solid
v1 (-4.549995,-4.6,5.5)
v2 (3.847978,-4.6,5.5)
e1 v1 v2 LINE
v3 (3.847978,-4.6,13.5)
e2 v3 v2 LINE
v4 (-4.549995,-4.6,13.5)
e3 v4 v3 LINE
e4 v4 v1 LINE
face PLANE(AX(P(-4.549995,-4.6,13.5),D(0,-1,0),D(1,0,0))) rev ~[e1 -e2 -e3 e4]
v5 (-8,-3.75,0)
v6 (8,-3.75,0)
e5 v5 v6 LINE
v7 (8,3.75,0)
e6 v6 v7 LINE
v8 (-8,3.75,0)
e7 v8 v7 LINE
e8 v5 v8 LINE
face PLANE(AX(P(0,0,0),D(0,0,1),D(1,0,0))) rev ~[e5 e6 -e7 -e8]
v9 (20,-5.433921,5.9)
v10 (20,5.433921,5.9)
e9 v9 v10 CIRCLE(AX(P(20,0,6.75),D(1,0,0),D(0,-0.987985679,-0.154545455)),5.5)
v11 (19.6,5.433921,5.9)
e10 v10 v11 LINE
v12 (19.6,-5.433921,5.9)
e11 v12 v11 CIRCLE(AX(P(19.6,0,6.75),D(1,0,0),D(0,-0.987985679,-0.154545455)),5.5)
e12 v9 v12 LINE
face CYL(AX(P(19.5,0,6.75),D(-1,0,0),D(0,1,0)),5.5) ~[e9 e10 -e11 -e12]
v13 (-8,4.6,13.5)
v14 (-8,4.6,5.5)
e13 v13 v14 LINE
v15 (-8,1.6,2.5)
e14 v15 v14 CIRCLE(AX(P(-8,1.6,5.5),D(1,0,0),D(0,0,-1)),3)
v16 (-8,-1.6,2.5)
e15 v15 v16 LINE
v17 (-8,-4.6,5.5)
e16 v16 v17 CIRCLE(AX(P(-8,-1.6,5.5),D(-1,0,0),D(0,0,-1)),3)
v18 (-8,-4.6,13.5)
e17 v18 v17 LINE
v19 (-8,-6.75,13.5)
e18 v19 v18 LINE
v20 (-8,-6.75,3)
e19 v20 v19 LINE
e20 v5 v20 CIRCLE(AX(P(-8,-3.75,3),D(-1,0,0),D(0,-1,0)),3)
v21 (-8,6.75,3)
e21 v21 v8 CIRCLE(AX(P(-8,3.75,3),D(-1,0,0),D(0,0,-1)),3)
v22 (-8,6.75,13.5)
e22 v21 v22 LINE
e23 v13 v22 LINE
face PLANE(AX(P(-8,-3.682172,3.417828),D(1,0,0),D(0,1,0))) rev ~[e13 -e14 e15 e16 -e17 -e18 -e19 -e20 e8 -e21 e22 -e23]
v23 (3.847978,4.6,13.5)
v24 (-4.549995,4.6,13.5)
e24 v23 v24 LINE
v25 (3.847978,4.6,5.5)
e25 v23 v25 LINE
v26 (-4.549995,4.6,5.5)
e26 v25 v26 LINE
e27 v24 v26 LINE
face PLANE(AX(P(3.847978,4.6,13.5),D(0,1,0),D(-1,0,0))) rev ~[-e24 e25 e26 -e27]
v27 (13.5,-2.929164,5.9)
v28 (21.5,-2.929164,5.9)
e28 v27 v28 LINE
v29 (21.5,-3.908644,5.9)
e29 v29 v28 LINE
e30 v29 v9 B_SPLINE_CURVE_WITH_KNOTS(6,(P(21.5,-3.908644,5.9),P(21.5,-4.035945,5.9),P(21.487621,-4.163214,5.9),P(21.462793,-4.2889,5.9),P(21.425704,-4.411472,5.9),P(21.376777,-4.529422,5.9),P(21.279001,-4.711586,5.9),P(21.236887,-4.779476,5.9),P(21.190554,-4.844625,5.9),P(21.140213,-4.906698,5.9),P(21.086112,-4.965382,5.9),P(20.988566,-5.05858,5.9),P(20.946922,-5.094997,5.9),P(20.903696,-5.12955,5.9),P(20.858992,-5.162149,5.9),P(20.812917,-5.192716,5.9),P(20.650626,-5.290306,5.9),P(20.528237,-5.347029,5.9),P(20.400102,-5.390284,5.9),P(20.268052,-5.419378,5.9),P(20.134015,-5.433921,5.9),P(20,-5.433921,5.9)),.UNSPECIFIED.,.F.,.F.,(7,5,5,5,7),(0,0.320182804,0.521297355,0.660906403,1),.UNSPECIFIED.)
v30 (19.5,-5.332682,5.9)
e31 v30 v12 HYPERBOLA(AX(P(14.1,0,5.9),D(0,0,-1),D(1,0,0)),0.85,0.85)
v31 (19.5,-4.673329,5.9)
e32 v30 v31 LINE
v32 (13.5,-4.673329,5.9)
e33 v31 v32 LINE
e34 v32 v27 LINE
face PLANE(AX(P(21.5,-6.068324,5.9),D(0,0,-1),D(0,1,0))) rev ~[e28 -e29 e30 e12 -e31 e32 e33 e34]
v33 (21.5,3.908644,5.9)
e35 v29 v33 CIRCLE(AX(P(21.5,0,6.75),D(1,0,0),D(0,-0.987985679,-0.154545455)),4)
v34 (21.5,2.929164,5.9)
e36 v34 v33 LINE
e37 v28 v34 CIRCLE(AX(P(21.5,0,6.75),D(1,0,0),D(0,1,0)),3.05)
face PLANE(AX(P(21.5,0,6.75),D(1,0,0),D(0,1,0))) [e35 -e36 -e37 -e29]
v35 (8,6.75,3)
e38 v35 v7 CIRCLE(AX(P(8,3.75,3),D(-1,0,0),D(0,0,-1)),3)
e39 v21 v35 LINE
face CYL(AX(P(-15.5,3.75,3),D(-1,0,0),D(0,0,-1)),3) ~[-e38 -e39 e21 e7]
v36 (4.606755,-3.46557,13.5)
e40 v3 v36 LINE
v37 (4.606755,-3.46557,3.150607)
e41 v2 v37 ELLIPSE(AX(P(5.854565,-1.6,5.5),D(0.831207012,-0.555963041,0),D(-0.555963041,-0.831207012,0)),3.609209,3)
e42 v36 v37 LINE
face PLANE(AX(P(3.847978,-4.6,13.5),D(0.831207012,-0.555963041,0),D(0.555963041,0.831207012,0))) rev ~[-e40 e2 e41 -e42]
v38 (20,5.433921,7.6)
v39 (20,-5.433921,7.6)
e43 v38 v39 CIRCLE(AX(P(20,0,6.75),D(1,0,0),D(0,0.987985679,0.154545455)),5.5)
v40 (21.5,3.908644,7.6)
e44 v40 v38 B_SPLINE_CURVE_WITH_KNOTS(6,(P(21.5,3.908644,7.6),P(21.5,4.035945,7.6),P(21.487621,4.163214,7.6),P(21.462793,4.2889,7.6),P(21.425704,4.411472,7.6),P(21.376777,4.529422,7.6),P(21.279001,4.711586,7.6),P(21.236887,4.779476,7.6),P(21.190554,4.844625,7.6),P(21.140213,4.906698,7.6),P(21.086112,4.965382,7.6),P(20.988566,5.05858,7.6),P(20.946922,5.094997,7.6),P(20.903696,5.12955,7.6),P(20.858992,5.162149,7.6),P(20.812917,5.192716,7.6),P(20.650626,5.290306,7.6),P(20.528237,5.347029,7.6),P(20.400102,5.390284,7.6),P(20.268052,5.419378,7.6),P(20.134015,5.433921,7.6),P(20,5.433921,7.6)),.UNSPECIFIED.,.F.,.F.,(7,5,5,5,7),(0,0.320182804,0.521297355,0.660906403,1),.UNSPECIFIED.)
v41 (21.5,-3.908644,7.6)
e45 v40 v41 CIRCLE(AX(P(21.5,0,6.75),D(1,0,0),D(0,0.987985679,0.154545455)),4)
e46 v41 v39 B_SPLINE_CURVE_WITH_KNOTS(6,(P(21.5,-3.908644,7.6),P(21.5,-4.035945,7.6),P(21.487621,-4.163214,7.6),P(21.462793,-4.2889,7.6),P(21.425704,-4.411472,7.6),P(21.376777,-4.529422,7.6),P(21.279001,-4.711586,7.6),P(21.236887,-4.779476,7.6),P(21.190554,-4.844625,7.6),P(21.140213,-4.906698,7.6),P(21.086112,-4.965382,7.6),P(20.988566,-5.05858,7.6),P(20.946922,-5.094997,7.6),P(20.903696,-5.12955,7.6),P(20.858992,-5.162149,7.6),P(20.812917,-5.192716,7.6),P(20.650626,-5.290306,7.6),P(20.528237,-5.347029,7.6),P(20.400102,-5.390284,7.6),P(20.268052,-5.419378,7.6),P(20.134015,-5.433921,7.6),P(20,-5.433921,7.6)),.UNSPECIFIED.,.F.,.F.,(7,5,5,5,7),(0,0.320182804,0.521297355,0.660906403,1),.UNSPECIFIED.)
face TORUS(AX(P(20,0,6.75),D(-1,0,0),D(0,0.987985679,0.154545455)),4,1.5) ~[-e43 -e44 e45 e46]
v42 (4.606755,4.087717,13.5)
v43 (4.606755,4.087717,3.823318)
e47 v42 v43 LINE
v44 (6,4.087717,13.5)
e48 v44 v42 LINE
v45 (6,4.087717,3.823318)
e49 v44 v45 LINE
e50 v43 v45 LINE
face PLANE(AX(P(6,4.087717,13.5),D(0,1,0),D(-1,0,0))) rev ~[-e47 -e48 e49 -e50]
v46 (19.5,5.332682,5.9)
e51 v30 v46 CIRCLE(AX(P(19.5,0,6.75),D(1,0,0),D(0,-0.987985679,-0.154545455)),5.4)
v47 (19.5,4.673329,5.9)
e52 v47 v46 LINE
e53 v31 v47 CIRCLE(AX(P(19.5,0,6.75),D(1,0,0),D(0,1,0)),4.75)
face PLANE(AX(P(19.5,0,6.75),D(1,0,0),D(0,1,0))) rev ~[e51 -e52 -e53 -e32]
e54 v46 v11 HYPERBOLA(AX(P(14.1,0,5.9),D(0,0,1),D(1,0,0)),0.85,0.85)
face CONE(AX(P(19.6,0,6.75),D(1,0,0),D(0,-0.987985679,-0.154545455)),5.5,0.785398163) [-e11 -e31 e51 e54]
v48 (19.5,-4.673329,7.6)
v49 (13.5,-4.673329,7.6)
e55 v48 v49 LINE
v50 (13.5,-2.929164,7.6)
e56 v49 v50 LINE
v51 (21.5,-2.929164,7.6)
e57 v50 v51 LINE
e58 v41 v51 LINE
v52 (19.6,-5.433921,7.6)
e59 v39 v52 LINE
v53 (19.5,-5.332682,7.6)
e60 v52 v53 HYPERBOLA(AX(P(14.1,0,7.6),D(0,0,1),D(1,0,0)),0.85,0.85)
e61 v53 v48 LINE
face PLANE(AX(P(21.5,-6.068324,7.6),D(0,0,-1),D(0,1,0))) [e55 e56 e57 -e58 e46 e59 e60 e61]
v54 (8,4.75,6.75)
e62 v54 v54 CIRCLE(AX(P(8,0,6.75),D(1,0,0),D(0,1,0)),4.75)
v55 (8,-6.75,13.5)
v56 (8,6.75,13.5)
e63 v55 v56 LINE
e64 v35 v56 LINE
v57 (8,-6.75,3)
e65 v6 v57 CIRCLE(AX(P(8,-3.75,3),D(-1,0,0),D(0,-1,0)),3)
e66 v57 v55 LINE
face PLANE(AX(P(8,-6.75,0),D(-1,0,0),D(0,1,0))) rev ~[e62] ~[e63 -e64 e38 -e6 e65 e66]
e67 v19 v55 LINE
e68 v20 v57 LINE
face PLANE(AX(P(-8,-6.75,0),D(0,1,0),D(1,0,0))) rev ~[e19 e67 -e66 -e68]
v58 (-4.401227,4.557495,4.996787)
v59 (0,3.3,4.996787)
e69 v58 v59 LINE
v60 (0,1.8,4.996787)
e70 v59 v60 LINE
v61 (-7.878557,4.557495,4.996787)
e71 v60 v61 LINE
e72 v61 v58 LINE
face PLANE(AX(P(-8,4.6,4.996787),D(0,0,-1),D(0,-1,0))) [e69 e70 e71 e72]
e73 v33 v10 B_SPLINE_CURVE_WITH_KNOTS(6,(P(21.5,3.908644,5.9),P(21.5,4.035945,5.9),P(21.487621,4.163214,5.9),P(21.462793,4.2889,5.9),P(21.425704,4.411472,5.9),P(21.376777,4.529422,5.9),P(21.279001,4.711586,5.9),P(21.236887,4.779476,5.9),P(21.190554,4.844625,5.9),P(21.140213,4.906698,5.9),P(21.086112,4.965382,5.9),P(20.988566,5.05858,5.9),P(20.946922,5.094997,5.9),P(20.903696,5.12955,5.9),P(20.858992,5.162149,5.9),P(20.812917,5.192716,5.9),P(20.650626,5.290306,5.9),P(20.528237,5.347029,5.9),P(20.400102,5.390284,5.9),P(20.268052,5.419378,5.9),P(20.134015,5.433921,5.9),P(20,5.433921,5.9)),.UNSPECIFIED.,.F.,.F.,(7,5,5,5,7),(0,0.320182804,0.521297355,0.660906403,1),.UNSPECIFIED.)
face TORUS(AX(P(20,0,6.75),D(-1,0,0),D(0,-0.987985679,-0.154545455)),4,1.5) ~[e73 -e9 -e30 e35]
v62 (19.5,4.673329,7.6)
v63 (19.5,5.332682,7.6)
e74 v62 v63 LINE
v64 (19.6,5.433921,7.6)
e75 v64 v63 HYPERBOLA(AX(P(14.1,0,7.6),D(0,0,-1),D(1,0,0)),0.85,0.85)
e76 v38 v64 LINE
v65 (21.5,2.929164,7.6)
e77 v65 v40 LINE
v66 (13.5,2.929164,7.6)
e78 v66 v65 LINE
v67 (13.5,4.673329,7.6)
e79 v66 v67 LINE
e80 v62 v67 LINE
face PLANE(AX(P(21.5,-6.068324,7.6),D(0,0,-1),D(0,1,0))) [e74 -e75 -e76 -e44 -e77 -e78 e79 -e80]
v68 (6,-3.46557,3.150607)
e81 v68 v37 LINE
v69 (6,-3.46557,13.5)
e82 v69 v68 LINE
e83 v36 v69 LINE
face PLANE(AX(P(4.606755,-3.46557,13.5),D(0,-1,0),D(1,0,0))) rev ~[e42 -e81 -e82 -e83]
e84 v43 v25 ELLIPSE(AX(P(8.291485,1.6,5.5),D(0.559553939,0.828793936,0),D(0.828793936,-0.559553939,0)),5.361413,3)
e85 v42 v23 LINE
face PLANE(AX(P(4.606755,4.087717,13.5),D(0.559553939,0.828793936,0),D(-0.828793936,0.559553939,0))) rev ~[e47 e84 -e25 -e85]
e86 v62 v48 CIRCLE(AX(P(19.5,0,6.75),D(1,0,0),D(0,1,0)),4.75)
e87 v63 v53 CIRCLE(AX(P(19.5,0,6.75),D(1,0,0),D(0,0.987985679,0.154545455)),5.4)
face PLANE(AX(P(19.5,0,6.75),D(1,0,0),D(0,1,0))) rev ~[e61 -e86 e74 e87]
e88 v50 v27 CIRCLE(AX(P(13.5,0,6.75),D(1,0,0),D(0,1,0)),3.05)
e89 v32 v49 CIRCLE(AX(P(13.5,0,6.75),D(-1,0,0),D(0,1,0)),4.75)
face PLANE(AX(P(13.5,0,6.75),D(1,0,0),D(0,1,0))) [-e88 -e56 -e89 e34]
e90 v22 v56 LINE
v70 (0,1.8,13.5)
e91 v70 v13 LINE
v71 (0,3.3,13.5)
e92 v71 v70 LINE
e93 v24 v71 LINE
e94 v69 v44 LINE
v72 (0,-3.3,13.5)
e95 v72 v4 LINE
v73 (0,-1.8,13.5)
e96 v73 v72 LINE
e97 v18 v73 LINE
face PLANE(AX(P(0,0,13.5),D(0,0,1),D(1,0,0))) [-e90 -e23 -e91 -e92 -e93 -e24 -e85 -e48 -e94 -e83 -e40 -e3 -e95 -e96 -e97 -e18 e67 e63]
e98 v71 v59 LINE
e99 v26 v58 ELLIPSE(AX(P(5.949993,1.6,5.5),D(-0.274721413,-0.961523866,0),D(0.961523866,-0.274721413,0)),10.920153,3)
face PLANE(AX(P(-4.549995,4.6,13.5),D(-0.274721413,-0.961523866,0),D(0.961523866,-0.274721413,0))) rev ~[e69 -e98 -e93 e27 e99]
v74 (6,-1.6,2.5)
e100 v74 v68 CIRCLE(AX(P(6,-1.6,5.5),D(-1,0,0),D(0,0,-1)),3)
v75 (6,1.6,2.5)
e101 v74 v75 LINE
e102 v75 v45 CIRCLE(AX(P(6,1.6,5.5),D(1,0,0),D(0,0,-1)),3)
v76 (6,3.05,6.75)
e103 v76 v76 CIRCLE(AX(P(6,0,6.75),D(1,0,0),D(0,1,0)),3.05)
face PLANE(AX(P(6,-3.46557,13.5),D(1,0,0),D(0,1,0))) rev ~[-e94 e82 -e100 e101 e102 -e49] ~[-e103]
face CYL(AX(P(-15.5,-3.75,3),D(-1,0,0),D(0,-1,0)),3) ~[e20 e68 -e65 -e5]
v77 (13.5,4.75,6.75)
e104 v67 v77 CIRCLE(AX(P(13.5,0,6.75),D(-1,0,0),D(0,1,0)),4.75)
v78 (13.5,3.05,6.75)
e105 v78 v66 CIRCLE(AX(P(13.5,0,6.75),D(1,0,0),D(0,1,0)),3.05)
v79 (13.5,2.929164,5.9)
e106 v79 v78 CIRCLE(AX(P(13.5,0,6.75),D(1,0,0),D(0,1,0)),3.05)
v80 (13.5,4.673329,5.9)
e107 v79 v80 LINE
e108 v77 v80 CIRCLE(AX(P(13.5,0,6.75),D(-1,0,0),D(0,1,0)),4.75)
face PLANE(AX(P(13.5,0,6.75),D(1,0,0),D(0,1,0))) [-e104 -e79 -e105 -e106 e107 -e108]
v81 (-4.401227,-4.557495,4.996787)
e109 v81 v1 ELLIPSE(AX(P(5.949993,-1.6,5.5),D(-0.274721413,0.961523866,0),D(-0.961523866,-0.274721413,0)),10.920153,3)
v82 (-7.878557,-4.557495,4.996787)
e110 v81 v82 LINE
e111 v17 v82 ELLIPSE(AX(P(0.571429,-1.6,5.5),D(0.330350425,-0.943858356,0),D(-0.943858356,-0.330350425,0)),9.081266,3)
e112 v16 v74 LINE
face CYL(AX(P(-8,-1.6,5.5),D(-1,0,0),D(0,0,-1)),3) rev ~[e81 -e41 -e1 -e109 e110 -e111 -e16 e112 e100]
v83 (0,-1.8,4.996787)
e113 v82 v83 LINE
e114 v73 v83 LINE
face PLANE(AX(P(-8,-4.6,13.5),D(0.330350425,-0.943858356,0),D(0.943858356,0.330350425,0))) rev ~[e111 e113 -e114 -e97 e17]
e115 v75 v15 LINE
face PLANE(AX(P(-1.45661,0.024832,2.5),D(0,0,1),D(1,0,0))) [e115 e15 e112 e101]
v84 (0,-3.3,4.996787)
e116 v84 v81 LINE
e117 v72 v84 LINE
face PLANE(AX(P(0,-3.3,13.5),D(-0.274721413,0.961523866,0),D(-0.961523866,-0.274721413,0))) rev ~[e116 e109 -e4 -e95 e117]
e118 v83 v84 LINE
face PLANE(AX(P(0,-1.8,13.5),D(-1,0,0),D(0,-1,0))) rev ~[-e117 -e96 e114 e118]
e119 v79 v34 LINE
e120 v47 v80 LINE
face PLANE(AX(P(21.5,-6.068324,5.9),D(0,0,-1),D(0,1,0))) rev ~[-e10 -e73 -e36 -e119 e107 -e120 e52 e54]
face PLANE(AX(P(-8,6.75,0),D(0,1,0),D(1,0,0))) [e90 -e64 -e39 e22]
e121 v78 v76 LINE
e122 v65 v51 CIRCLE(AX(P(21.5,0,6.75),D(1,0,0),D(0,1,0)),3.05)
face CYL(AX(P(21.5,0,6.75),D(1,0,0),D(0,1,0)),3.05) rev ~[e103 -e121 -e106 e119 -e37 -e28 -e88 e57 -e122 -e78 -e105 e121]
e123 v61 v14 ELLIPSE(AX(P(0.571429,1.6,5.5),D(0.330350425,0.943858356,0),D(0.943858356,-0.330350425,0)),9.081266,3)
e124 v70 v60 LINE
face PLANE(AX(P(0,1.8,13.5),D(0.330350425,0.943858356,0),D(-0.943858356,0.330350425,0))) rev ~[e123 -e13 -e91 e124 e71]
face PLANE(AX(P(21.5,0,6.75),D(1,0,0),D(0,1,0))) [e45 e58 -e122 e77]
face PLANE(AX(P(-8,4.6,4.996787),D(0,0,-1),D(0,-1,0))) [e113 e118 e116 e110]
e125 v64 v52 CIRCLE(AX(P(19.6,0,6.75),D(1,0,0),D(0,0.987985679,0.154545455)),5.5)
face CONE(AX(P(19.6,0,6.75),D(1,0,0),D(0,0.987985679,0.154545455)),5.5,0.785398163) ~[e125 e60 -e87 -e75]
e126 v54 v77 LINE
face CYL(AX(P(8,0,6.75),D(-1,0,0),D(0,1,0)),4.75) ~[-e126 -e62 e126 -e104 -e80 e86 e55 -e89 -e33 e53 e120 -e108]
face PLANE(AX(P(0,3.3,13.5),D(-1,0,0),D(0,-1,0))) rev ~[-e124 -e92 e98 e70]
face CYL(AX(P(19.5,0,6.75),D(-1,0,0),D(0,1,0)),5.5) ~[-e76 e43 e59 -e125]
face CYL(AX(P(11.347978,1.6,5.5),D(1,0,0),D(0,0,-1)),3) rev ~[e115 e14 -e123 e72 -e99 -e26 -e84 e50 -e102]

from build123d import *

# Parameters (mm, degrees)
F0_W          = 16
F0_H          = 13.5
F1_DEPTH      = 13.5
F2_R          = 4.75
F3_DEPTH      = 11.5
F4_R          = 5.5
F5_DEPTH      = 2
F7_DEPTH      = 11
F8_R          = 3.05
F9_DEPTH      = 17
F10_W         = 9.2
F10_H         = 2.4967868254
F11_DEPTH     = 10
F12_W         = 12.1366479748
F12_H         = 1.7
F13_DEPTH     = 8
F14_T4_DEPTH  = 19.347977845
F14_T9_DEPTH  = 19.347977845
F14_T11_DEPTH = 31
F15_R         = 1.5
F16_SIZE      = 0.1


# Not quite as in the source:
# - a fillet or chamfer that OpenCascade refuses, or shapes differently, is made with other operations: its cross-section is extruded or revolved along the edge and cut away or added


with BuildPart() as f1:
    # F0 (on Top) → F1 (new body)
    with BuildSketch(Plane.XY):
        Rectangle(F0_W, F0_H)
    extrude(amount=F1_DEPTH)

    # F2 (on face) → F3 (join)
    with BuildSketch(Plane.YZ.offset(8)):
        with Locations((0, 6.75)):
            Circle(F2_R)
    extrude(amount=F3_DEPTH)

    # F4 (on face) → F5 (join)
    with BuildSketch(Plane.YZ.offset(19.5)):
        with Locations((0, 6.75)):
            Circle(F4_R)
    extrude(amount=F5_DEPTH)

    # F6 (on face) → F7 (cut)
    with BuildSketch(Plane.XY.offset(13.5)):
        Polygon((0, 3.3), (0, 1.8), (-8, 4.6), (-8, -4.6), (0, -1.8), (0, -3.3), (-4.5499948867, -4.6), (3.847977845, -4.6), (4.6067554504, -3.4655697951), (6, -3.4655697951), (6, 4.0877170554), (4.6067554504, 4.0877170554), (3.847977845, 4.6), (-4.5499948867, 4.6), align=None)
    extrude(amount=-F7_DEPTH, mode=Mode.SUBTRACT)

    # F8 (on face) → F9 (cut)
    with BuildSketch(Plane.YZ.offset(21.5)):
        with Locations((0, 6.75)):
            Circle(F8_R)
    extrude(amount=-F9_DEPTH, mode=Mode.SUBTRACT)

    # F10 (on face) → F11 (cut)
    with BuildSketch(Plane(origin=(-8, 0, 0), x_dir=(0, -1, 0), z_dir=(-1, 0, 0))):
        with Locations((0, 3.7483934127)):
            Rectangle(F10_W, F10_H)
    extrude(amount=-F11_DEPTH, mode=Mode.SUBTRACT)

    # F12 (on face) → F13 (cut)
    with BuildSketch(Plane.YZ.offset(21.5)):
        with Locations((0, 6.75)):
            Rectangle(F12_W, F12_H)
    extrude(amount=-F13_DEPTH, mode=Mode.SUBTRACT)

    # F14: fillet of radius 3 on 4 edges, made by hand


with BuildPart() as f14_tool2:
    # F14_s3 → F14_t4 (new body)
    with BuildSketch(Plane.YZ.offset(11.347977845)):
        with BuildLine():
            ThreePointArc((1.6, 2.5), (3.7213203436, 3.3786796564), (4.6, 5.5))
            Line((4.6, 5.5), (4.6, 2.5))
            Line((4.6, 2.5), (1.6, 2.5))
        make_face()
    extrude(amount=-F14_T4_DEPTH)

    split(bisect_by=Plane.YZ.offset(6), keep=Keep.BOTTOM)


with BuildPart() as f1_1:
    add(f1.part)

    # F14_t1: union F14_tool2
    add(f14_tool2.part)


with BuildPart() as f14_tool7:
    # F14_s8 → F14_t9 (new body)
    with BuildSketch(Plane.YZ.offset(-8)):
        with BuildLine():
            ThreePointArc((-1.6, 2.5), (-3.7213203436, 3.3786796564), (-4.6, 5.5))
            Line((-4.6, 5.5), (-4.6, 2.5))
            Line((-4.6, 2.5), (-1.6, 2.5))
        make_face()
    extrude(amount=F14_T9_DEPTH)

    split(bisect_by=Plane.YZ.offset(6), keep=Keep.BOTTOM)


with BuildPart() as f1_2:
    add(f1_1.part)

    # F14_t6: union F14_tool7
    add(f14_tool7.part)

    # F14_s12 → F14_t11 (cut)
    with BuildSketch(Plane.YZ.offset(-15.5)):
        with BuildLine():
            ThreePointArc((3.75, 0), (5.8713203436, 0.8786796564), (6.75, 3))
            Line((6.75, 3), (6.75, 0))
            Line((6.75, 0), (3.75, 0))
        make_face()
        with BuildLine():
            ThreePointArc((-6.75, 3), (-5.8713203436, 0.8786796564), (-3.75, 0))
            Line((-3.75, 0), (-6.75, 0))
            Line((-6.75, 0), (-6.75, 3))
        make_face()
    extrude(amount=F14_T11_DEPTH, mode=Mode.SUBTRACT)

    # F15
    f15_edges = [f1_2.edges().sort_by_distance(p)[0] for p in [
        (21.5, 0, 12.25),
        (21.5, 0, 1.25),
    ]]
    fillet(f15_edges, radius=F15_R)

    # F16
    f16_edges = [f1_2.edges().sort_by_distance(p)[0] for p in [
        (19.5, 0, 1.25),
        (19.5, 0, 12.25),
    ]]
    chamfer(f16_edges, length=F16_SIZE)


solid = f1_2.part
